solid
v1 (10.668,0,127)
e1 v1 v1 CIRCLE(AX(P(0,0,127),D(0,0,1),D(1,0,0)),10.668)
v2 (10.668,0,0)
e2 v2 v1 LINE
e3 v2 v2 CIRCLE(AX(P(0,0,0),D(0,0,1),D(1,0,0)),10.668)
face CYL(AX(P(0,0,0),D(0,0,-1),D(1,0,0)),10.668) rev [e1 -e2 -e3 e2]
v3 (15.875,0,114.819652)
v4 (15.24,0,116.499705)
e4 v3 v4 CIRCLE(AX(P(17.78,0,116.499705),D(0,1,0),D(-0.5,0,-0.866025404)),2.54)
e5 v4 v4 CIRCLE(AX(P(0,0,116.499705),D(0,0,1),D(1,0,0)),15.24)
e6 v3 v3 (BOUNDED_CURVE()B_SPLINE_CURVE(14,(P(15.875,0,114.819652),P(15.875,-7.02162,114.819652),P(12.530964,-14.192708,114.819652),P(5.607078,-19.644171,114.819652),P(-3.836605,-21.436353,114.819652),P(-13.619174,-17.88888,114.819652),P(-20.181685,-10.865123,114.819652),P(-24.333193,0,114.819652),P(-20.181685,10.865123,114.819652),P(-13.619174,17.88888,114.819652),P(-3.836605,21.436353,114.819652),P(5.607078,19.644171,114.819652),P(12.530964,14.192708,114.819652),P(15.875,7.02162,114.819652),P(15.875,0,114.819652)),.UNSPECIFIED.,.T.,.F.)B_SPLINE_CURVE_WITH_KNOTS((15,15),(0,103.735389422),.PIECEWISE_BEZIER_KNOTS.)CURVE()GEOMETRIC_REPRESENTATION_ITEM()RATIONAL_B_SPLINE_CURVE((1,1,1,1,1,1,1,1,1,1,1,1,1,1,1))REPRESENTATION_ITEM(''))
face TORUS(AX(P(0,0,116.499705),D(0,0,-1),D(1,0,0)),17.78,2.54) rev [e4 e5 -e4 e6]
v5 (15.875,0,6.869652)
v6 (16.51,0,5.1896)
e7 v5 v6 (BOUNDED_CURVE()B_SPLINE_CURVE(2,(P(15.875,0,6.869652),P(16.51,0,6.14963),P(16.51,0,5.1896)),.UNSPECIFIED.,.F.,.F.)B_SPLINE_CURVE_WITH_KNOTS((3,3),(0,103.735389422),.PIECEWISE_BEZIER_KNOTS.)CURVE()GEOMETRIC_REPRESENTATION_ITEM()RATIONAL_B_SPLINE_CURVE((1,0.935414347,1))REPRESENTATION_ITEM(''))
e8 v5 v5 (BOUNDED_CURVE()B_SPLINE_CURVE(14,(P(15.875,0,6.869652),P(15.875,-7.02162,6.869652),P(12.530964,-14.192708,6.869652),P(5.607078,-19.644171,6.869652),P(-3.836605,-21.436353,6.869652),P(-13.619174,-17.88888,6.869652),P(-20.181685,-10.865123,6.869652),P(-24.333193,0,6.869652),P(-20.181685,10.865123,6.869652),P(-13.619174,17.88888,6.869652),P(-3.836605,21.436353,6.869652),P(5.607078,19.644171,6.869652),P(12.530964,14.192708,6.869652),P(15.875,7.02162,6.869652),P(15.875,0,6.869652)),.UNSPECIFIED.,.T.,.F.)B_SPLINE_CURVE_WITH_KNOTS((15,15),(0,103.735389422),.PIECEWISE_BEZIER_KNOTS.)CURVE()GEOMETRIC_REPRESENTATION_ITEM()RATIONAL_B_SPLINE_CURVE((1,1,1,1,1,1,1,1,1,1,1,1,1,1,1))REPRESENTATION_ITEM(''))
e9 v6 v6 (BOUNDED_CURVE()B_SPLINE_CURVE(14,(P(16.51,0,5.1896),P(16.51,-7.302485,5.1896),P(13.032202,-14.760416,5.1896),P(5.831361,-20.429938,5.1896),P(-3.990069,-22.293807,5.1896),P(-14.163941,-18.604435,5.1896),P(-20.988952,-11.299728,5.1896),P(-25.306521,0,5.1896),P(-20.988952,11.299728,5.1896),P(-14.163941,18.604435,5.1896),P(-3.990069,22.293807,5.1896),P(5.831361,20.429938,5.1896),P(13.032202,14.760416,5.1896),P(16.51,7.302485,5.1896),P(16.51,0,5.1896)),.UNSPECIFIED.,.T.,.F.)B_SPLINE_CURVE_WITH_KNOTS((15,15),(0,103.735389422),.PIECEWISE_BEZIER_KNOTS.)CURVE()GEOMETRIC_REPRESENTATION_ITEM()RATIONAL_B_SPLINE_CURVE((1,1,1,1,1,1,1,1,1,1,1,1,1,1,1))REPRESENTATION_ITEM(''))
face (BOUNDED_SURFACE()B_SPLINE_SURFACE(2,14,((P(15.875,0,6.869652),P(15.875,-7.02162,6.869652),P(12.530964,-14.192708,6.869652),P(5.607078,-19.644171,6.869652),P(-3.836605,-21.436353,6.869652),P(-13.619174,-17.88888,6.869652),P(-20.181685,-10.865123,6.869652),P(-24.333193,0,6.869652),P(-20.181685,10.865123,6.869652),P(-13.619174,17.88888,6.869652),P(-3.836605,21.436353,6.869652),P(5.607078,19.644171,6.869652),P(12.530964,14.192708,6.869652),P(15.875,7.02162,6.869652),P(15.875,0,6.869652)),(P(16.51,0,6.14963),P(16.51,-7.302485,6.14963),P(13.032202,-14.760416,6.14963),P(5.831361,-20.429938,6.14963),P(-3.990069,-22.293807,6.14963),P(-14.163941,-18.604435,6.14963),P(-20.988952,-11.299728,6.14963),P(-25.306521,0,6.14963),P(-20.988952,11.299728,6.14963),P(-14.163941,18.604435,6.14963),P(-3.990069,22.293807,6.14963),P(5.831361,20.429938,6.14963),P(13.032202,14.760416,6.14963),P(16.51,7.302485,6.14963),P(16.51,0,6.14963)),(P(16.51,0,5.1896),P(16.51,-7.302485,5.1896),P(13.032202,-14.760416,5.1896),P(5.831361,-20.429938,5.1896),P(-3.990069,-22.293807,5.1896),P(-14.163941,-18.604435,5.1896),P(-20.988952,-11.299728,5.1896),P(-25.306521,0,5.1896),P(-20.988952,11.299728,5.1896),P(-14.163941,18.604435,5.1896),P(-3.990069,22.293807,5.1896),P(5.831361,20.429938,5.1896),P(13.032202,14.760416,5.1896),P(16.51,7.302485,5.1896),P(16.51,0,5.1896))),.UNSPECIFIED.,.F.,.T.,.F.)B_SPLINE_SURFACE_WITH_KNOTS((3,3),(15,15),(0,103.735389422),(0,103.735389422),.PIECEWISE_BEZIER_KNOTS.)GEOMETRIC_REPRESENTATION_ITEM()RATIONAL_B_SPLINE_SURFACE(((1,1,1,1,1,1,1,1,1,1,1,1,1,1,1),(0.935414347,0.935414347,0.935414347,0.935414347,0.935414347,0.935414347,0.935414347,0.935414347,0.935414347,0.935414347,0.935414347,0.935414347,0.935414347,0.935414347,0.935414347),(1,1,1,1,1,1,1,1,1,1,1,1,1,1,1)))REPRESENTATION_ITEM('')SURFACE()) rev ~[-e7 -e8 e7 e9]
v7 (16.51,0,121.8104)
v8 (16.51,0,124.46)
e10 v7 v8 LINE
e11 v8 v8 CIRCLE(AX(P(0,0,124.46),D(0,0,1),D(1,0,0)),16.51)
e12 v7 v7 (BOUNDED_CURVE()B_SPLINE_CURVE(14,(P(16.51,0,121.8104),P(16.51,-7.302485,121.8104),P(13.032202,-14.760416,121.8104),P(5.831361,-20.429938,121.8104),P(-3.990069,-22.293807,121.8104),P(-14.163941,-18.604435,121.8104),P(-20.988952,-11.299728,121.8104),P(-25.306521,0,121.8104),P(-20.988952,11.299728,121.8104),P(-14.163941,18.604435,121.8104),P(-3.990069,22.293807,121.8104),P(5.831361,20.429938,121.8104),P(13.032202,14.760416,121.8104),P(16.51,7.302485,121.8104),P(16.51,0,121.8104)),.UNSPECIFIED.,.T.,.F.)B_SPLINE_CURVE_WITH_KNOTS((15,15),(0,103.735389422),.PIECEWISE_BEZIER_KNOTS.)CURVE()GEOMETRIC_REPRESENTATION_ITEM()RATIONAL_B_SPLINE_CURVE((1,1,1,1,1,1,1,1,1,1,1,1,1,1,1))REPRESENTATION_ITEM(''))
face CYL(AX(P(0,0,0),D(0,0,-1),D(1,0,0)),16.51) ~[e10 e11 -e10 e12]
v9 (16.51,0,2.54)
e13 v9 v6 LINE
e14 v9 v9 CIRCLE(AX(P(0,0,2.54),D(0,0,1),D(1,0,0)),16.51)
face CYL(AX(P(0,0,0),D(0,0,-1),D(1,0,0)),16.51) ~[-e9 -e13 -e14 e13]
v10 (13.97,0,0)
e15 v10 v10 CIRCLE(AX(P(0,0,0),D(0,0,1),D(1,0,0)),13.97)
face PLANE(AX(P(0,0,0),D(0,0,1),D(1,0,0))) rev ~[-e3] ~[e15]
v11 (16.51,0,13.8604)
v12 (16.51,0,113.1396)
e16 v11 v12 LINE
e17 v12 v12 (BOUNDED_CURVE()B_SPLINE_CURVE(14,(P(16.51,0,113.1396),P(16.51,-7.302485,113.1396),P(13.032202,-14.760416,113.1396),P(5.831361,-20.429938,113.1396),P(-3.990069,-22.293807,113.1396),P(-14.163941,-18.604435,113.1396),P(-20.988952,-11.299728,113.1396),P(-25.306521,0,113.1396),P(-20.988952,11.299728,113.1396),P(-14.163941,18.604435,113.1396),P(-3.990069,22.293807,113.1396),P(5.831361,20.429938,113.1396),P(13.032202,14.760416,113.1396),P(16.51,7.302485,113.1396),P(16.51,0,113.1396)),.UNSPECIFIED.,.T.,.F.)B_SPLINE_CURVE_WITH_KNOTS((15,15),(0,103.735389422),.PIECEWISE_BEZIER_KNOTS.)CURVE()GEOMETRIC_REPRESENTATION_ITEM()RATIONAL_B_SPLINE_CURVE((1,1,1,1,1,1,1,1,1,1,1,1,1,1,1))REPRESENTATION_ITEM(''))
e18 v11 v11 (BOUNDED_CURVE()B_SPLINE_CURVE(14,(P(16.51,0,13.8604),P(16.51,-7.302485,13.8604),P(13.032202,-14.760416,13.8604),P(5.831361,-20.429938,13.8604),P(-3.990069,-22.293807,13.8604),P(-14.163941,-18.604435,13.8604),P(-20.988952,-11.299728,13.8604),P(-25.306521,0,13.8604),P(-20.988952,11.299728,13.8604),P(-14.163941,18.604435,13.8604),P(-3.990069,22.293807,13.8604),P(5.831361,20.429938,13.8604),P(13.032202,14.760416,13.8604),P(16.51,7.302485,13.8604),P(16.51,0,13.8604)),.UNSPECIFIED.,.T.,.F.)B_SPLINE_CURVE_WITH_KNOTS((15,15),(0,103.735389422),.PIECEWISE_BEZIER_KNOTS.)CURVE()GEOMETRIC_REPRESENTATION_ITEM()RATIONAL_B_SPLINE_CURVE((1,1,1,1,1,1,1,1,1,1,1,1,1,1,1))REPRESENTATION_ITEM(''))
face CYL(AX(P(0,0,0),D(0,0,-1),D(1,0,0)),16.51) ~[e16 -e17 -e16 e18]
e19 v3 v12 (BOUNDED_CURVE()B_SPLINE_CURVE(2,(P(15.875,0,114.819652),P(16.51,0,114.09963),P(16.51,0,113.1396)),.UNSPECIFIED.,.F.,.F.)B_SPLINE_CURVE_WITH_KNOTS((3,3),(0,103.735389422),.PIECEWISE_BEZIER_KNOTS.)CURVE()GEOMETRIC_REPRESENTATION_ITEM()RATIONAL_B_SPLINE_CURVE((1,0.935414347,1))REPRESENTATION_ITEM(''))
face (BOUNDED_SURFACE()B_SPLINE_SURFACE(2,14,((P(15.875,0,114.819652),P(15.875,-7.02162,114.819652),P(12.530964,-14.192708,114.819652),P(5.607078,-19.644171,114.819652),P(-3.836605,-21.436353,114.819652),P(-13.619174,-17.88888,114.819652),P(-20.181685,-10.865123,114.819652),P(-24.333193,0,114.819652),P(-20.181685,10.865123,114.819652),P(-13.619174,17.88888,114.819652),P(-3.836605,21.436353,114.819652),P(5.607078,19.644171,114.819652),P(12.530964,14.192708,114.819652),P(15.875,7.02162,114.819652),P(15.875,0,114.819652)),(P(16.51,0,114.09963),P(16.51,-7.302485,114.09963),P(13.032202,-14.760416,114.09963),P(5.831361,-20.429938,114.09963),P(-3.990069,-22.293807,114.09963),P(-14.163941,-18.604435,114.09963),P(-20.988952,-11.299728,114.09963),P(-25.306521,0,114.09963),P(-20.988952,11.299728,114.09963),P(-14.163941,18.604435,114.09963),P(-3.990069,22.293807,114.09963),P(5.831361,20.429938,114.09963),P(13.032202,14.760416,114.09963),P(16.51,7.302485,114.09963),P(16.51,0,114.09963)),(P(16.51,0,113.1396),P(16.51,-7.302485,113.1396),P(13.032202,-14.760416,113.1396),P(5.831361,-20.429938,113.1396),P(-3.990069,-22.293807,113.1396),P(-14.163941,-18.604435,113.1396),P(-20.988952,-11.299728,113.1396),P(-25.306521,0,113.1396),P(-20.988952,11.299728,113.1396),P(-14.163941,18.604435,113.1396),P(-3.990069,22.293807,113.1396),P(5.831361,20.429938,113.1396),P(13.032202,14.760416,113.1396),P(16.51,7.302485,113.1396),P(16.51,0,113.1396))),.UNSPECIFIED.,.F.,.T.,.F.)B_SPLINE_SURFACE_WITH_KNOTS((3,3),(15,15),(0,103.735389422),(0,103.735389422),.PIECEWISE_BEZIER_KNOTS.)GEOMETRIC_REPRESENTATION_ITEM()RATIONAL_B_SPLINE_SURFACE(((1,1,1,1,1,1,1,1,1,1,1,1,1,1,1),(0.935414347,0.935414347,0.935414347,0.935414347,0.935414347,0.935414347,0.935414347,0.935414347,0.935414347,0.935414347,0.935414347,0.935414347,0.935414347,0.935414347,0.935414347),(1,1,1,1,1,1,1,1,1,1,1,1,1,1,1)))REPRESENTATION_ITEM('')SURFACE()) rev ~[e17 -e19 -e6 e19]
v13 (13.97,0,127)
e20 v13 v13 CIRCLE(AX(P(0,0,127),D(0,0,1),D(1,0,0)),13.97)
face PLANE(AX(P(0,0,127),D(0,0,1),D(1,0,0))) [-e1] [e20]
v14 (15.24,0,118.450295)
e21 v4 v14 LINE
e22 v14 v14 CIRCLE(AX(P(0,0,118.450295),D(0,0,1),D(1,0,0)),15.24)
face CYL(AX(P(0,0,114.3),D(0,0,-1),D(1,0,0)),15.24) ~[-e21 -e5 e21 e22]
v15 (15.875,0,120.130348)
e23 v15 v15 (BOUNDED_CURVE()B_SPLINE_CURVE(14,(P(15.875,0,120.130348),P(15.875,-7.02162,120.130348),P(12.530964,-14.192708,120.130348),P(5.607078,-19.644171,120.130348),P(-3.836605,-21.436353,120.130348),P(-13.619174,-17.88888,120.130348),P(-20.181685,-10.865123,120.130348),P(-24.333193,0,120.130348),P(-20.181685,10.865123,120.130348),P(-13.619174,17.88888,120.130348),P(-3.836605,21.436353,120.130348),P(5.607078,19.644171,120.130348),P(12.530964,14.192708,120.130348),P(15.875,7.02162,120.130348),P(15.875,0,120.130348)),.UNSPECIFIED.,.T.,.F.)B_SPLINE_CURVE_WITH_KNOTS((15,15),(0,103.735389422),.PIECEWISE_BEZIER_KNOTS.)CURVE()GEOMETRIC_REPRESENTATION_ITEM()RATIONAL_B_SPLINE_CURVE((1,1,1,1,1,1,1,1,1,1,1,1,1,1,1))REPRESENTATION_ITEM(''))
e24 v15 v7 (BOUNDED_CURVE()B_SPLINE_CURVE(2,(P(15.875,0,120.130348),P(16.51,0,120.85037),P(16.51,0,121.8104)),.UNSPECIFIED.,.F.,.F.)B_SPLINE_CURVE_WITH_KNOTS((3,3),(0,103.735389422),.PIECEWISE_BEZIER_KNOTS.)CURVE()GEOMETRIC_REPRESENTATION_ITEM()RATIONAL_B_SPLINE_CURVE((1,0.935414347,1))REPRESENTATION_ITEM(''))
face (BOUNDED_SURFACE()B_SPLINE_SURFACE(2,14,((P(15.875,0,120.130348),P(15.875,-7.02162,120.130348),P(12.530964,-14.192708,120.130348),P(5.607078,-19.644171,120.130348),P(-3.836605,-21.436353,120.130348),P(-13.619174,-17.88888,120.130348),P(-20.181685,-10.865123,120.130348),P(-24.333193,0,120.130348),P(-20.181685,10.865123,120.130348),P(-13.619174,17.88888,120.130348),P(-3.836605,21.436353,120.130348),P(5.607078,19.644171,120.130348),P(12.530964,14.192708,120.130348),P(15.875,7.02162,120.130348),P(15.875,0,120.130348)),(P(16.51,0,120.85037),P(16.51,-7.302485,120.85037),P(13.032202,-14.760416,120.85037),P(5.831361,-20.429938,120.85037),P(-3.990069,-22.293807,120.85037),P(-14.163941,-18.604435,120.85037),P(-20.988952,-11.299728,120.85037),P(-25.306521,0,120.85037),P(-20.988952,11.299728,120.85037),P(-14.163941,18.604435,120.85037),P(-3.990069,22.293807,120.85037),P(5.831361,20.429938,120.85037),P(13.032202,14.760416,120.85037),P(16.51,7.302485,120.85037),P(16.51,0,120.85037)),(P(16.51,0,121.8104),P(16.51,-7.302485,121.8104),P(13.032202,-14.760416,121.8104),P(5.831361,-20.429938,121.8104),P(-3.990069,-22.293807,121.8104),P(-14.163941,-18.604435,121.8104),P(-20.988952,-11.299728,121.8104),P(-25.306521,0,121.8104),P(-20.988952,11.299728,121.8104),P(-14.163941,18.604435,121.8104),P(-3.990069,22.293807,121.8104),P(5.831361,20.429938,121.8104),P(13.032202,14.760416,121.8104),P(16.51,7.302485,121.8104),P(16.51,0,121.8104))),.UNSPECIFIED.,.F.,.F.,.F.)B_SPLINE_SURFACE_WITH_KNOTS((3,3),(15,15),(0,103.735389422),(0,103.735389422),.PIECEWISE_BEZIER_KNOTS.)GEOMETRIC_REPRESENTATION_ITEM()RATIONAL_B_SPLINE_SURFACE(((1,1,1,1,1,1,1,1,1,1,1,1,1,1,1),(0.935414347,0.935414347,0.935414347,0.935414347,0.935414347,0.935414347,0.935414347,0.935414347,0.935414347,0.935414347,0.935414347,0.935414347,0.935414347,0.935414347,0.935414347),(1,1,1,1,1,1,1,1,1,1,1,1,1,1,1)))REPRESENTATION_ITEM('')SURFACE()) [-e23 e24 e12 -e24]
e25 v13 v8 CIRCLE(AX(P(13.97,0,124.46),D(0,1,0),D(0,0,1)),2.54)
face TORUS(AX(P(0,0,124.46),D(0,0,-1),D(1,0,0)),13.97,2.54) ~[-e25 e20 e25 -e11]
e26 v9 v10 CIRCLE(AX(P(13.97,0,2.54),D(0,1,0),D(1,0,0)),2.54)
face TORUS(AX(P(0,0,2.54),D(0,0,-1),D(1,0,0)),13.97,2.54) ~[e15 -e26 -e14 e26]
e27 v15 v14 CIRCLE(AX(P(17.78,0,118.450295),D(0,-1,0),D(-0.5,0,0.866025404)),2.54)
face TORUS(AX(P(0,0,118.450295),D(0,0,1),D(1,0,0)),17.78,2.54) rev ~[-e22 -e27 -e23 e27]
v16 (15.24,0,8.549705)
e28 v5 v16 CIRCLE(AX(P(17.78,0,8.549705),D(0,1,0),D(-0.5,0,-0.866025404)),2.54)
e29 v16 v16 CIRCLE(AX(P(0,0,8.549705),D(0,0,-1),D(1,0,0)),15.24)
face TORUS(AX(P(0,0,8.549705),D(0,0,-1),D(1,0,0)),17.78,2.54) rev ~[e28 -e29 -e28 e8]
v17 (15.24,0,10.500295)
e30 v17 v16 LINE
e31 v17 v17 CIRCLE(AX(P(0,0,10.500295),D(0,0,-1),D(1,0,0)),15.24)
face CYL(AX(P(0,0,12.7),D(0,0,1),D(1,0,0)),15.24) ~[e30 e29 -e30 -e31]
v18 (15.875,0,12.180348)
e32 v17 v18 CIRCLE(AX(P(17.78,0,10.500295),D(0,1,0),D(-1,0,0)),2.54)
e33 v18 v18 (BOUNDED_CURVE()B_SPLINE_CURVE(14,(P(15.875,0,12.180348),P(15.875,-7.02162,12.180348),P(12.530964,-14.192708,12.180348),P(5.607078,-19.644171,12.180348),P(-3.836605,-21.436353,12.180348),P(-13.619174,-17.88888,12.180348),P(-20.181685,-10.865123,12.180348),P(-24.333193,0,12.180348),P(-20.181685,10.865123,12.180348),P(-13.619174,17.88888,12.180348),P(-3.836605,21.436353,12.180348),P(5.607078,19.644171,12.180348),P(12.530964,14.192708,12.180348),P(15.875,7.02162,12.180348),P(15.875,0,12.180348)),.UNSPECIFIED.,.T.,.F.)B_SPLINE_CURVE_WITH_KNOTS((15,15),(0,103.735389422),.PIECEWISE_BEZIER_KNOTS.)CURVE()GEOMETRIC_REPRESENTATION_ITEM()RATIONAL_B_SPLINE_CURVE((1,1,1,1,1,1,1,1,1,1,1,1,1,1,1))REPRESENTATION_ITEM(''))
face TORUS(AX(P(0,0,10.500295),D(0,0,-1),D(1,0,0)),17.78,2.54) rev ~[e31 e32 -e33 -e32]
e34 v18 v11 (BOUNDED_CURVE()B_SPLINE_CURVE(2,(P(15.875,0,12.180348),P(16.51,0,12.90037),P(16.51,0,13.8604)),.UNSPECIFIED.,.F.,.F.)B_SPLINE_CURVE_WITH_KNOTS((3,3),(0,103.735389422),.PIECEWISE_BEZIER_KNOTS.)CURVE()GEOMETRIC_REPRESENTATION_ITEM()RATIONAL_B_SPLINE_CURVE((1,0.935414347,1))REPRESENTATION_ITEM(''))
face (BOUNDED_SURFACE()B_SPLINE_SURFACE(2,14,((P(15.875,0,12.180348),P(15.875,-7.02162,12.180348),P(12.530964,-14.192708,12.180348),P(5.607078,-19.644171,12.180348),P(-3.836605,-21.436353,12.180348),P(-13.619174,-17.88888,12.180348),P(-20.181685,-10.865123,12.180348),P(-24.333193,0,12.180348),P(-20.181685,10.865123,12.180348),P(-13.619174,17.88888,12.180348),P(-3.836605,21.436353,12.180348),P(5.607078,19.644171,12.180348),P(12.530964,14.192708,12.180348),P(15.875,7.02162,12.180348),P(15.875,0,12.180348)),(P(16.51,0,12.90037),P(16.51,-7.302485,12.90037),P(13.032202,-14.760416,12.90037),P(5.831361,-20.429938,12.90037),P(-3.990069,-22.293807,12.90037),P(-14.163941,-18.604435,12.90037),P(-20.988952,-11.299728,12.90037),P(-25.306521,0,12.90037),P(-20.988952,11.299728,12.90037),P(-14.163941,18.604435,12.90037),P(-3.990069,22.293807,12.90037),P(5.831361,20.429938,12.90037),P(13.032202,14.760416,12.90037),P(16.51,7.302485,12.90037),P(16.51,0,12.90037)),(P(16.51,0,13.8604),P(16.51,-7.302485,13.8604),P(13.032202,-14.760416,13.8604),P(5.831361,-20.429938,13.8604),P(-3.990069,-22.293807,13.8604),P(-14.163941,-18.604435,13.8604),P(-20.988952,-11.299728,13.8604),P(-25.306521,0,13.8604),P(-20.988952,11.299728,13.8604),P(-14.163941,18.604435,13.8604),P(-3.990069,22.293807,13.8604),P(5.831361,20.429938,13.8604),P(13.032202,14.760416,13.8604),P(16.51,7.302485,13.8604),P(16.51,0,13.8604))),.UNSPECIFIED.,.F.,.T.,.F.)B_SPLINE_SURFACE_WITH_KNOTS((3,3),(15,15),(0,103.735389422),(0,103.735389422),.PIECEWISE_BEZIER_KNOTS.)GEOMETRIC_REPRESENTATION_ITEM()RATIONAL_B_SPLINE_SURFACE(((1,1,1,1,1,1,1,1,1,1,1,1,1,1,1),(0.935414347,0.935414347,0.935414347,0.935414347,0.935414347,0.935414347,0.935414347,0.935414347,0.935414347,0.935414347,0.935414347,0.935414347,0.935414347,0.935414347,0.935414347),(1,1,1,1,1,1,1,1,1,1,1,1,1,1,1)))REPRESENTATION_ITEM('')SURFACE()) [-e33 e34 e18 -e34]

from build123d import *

# Parameters (mm, degrees)
F0_R     = 16.51
F0_R_2   = 10.668
F1_DEPTH = 127
F3_R     = 16.9570806309
F3_R_2   = 15.24
F4_DEPTH = 6.35
F6_R     = 19.4483101308
F6_R_2   = 15.24
F7_DEPTH = 6.35
F8_R     = 2.54
F11_R    = 2.54
F14_R    = 2.54


# Not quite as in the source:
# - a fillet or chamfer that OpenCascade refuses, or shapes differently, is made with other operations: its cross-section is extruded or revolved along the edge and cut away or added


with BuildPart() as f1:
    # F0 (on Top) → F1 (new body)
    with BuildSketch(Plane.XY):
        Circle(F0_R)
        Circle(F0_R_2, mode=Mode.SUBTRACT)
    extrude(amount=F1_DEPTH)

    # F3 (on offset) → F4 (cut)
    with BuildSketch(Plane.XY.offset(114.3)):
        Circle(F3_R)
        Circle(F3_R_2, mode=Mode.SUBTRACT)
    extrude(amount=F4_DEPTH, mode=Mode.SUBTRACT)

    # F6 (on offset) → F7 (cut)
    with BuildSketch(Plane(origin=(0, 0, 12.7), x_dir=(1, 0, 0), z_dir=(0, 0, -1))):
        Circle(F6_R)
        Circle(F6_R_2, mode=Mode.SUBTRACT)
    extrude(amount=F7_DEPTH, mode=Mode.SUBTRACT)

    # F8
    f8_edges = [f1.edges().sort_by_distance(p)[0] for p in [
        (-16.51, 0, 0),
    ]]
    fillet(f8_edges, radius=F8_R)

    # F9: fillet of radius 2.54 on 1 edges, made by hand

    # F9_s1 → F9_t2 (revolve)
    with BuildSketch(Plane.XZ):
        with BuildLine():
            ThreePointArc((15.24, 10.5002954744), (15.5802954744, 11.7702954744), (16.51, 12.7))
            Line((16.51, 12.7), (15.24, 12.7))
            Line((15.24, 12.7), (15.24, 10.5002954744))
        make_face()
    revolve(axis=Axis((0, 0, 12.7), (0, 0, -1)))

    # F10: fillet of radius 2.54 on 1 edges, made by hand

    # F10_s1 → F10_t2 (revolve)
    with BuildSketch(Plane.XZ):
        with BuildLine():
            ThreePointArc((16.51, 6.35), (15.5802954744, 7.2797045256), (15.24, 8.5497045256))
            Line((15.24, 8.5497045256), (15.24, 6.35))
            Line((15.24, 6.35), (16.51, 6.35))
        make_face()
    revolve(axis=Axis((0, 0, 6.35), (0, 0, -1)))

    # F11
    f11_edges = [f1.edges().sort_by_distance(p)[0] for p in [
        (-16.51, 0, 12.7),
        (-16.51, 0, 6.35),
    ]]
    fillet(f11_edges, radius=F11_R)

    # F12: fillet of radius 2.54 on 2 edges, made by hand

    # F12_s1 → F12_t2 (revolve)
    with BuildSketch(Plane.XZ):
        with BuildLine():
            ThreePointArc((16.51, 114.3), (15.5802954744, 115.2297045256), (15.24, 116.4997045256))
            Line((15.24, 116.4997045256), (15.24, 114.3))
            Line((15.24, 114.3), (16.51, 114.3))
        make_face()
    revolve(axis=Axis((0, 0, 114.3), (0, 0, 1)))

    # F12_s3 → F12_t4 (revolve, cut)
    with BuildSketch(Plane.XZ):
        with BuildLine():
            ThreePointArc((13.97, 127), (15.7660512242, 126.2560512242), (16.51, 124.46))
            Line((16.51, 124.46), (16.51, 127))
            Line((16.51, 127), (13.97, 127))
        make_face()
    revolve(axis=Axis((0, 0, 127), (0, 0, 1)), mode=Mode.SUBTRACT)

    # F13: fillet of radius 2.54 on 1 edges, made by hand

    # F13_s1 → F13_t2 (revolve)
    with BuildSketch(Plane.XZ):
        with BuildLine():
            ThreePointArc((16.51, 120.65), (15.5802954744, 119.7202954744), (15.24, 118.4502954744))
            Line((15.24, 118.4502954744), (15.24, 120.65))
            Line((15.24, 120.65), (16.51, 120.65))
        make_face()
    revolve(axis=Axis((0, 0, 120.65), (0, 0, 1)))

    # F14
    f14_edges = [f1.edges().sort_by_distance(p)[0] for p in [
        (-16.51, 0, 120.65),
        (-16.51, 0, 114.3),
    ]]
    fillet(f14_edges, radius=F14_R)


solid = f1.part
